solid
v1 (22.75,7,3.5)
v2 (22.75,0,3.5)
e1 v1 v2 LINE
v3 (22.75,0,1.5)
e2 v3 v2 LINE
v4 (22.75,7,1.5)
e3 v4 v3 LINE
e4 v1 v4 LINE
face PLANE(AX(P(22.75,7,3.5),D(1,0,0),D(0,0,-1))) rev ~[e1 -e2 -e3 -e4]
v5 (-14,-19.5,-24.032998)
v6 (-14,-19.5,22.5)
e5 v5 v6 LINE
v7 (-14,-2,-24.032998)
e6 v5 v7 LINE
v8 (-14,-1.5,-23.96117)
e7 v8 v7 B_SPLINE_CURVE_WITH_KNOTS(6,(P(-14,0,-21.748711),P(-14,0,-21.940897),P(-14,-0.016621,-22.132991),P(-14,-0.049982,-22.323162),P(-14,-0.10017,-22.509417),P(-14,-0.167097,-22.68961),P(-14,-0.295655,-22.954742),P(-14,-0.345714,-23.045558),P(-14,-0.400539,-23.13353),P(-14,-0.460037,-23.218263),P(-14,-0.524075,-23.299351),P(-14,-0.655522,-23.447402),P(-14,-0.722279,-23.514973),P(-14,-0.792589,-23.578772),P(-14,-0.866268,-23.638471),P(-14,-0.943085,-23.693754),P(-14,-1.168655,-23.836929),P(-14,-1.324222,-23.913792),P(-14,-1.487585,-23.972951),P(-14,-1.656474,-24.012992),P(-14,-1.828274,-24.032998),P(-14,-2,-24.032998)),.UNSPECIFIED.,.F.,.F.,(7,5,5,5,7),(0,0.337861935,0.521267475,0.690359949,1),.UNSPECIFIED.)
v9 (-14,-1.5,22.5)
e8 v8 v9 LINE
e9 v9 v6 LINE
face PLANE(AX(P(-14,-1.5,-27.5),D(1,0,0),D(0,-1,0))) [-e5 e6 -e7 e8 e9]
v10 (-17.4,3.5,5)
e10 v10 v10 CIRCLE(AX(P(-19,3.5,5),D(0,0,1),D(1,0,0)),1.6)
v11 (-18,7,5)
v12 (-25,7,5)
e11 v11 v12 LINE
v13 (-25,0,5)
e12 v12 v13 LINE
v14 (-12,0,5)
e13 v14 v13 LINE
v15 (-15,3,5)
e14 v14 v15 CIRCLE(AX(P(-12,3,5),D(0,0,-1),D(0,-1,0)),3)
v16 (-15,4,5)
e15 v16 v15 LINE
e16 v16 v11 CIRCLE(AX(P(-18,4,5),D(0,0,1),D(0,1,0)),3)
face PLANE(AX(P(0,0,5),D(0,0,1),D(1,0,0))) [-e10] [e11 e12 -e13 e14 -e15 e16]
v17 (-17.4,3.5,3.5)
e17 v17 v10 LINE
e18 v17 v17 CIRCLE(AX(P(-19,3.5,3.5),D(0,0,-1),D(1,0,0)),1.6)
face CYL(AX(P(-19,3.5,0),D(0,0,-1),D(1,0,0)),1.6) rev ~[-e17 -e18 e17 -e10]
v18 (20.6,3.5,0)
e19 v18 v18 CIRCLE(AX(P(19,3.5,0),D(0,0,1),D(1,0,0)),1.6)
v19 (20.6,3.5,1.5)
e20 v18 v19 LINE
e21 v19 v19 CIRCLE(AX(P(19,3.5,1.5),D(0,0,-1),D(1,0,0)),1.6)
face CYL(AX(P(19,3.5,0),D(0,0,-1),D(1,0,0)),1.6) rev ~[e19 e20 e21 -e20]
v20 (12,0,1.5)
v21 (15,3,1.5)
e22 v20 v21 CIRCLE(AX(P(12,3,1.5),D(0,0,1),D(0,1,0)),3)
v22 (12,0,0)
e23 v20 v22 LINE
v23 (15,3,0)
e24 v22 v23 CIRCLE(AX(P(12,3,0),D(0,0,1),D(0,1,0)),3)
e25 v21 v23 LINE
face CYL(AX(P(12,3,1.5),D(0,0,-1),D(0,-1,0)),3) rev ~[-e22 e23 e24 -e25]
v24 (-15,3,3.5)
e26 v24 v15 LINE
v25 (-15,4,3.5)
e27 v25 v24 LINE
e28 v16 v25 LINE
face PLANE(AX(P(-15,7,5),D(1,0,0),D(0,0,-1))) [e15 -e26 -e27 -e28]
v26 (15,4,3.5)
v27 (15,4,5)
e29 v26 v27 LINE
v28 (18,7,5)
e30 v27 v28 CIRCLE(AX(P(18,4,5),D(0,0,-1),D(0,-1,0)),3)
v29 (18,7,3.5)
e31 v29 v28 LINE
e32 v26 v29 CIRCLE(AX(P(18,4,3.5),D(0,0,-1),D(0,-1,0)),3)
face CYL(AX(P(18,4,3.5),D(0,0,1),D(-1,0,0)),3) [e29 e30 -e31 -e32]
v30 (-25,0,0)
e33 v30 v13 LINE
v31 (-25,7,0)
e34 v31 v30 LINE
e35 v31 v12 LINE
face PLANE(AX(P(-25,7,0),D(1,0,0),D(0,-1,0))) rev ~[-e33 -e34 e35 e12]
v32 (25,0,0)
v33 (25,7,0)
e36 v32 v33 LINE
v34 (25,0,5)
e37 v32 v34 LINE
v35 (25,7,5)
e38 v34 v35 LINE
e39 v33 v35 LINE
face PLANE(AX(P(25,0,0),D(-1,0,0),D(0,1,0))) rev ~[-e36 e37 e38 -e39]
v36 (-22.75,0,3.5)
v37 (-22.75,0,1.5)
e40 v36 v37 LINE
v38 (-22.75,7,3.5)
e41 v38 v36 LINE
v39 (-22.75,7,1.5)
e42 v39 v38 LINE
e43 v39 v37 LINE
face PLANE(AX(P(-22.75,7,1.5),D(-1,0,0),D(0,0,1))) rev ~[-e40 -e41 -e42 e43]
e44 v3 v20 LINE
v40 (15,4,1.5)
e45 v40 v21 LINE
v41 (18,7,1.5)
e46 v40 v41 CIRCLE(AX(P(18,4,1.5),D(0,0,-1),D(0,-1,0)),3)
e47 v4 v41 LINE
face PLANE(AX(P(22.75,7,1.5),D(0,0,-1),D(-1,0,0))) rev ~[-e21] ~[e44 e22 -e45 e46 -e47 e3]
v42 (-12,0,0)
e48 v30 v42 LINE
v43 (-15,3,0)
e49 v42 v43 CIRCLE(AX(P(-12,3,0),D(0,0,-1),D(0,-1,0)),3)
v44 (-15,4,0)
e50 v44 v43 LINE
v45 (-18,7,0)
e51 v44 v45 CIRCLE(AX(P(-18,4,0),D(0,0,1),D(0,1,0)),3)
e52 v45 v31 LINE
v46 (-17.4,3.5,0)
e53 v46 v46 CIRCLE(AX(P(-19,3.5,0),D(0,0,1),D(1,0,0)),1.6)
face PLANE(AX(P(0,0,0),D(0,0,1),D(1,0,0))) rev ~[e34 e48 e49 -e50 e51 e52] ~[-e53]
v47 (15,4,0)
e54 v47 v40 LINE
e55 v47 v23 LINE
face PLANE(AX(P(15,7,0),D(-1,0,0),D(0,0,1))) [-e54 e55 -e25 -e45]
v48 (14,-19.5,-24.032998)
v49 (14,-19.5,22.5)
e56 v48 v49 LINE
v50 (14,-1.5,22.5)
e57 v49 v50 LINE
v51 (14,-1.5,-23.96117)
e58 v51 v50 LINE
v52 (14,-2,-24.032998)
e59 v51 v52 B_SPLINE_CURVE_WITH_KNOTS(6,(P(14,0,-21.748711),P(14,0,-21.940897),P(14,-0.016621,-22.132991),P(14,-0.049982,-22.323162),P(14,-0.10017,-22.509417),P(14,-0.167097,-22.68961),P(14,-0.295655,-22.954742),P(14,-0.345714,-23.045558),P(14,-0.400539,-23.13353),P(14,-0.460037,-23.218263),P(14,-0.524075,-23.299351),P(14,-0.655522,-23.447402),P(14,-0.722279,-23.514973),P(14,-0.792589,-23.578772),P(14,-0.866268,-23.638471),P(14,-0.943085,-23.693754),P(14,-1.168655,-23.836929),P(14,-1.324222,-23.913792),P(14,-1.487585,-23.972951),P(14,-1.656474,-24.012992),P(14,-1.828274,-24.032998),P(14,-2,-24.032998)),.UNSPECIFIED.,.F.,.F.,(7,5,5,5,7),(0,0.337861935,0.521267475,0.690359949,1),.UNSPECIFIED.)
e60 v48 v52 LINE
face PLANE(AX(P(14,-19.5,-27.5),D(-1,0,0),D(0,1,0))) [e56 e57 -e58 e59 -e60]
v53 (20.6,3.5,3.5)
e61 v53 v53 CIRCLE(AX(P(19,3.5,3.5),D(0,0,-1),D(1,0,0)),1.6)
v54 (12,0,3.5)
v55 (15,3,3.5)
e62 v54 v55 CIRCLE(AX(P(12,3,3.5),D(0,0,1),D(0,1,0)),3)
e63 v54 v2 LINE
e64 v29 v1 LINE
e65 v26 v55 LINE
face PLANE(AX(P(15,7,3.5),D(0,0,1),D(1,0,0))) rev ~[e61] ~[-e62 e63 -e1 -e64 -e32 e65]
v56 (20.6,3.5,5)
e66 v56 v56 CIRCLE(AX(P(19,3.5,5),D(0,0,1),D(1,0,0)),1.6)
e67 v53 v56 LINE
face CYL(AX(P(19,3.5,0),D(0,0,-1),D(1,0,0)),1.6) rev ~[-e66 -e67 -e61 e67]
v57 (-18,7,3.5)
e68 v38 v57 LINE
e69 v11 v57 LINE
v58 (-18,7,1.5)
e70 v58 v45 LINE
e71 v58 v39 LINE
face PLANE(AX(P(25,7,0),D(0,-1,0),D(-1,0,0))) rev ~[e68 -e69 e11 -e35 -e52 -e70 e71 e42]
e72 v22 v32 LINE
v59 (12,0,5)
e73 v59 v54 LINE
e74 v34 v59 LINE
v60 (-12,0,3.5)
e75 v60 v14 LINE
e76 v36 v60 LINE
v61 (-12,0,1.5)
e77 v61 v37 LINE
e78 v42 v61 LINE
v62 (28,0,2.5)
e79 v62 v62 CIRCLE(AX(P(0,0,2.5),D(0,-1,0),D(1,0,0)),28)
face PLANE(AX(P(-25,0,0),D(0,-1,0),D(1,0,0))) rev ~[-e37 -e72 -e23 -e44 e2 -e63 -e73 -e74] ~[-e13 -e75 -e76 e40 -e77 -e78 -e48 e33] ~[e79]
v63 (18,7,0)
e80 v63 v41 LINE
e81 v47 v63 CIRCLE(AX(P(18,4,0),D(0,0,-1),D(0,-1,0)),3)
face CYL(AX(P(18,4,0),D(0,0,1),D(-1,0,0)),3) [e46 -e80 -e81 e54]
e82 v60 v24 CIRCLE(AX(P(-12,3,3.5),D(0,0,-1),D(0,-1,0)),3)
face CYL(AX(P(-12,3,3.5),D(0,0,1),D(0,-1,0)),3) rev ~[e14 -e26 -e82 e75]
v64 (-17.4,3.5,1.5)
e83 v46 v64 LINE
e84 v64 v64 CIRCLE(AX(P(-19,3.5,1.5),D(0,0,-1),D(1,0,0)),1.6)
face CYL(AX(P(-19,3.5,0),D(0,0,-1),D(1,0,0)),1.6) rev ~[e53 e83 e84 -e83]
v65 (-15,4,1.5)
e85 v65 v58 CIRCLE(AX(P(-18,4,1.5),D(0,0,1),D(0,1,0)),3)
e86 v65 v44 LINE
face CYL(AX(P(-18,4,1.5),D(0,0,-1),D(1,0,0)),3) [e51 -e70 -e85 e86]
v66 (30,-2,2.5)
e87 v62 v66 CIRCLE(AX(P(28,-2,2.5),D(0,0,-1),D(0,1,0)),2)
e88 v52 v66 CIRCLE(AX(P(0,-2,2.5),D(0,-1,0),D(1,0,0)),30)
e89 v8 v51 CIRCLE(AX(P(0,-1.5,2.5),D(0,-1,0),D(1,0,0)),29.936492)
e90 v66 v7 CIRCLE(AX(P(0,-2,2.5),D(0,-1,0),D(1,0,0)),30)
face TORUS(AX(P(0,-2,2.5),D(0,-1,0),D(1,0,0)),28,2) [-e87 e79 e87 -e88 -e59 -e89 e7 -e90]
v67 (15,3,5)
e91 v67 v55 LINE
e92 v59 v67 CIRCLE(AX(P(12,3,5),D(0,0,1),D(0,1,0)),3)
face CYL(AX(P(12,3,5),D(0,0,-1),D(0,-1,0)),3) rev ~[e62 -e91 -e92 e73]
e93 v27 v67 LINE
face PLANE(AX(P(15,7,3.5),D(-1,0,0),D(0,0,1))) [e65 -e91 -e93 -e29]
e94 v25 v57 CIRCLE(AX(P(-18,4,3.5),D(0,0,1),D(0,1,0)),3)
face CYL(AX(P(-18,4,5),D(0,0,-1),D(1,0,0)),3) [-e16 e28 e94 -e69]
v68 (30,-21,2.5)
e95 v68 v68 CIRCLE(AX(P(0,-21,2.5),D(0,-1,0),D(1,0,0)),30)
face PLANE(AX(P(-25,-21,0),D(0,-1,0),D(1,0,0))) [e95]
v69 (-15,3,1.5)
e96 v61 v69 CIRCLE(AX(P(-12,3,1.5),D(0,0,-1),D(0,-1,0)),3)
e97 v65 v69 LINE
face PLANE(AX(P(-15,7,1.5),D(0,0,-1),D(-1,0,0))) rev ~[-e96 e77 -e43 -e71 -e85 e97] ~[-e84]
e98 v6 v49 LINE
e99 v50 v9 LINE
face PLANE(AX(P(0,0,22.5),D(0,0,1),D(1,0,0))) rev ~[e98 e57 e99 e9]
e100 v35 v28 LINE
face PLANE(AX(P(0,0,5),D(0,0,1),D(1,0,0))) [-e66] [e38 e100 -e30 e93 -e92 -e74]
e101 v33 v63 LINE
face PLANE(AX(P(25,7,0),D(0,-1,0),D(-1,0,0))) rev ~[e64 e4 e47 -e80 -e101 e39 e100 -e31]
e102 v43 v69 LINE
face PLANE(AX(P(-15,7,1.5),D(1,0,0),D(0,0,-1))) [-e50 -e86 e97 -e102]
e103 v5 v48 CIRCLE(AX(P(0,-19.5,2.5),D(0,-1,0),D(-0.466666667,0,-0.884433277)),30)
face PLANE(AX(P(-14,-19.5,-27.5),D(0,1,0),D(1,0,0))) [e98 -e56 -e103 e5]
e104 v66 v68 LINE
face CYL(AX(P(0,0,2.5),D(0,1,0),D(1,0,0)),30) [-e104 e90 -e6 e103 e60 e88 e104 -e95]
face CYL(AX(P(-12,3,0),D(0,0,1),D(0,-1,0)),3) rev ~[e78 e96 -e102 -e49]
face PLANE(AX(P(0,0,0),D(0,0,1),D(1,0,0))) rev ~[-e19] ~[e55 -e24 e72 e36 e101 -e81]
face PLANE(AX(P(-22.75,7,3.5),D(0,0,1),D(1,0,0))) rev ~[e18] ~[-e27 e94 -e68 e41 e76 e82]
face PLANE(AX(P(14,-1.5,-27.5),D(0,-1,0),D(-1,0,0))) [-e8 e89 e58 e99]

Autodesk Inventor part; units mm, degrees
ref_plane "Work Plane2" through (0, 0, 32.5) normal (0, 0, 1) x (1, 0, 0)
ref_plane "YZ Plane" through (0, 0, 0) normal (1, 0, 0) x (0, 1, 0)
sketch "Sketch1" plane through (0, 0, 0) normal (0, 0, 1) x (1, 0, 0)
  line L0 (25, 7) -> (-25, 7)
  line L1 (-25, 7) -> (-25, 0)
  line L2 (-25, 0) -> (25, 0)
  line L3 (25, 0) -> (25, 7)
  circle A0 centre (-19, 3.5) radius 1.6
  circle A1 centre (19, 3.5) radius 1.6
  line L4 (19, 3.5) -> (-19, 3.5) construction
  line L5 (19, 3.5) -> (25, 7) construction
  line L6 (19, 3.5) -> (25, 0) construction
  line L7 (-19, 3.5) -> (-25, 7) construction
  line L8 (-19, 3.5) -> (-25, 0) construction
  line L9 (0, 0) -> (-19, 3.5) construction
  line L10 (0, 0) -> (19, 3.5) construction
  dimension "d0" = 3.2
  dimension "d1" = 38
  dimension "d2" = 7
  dimension "d3" = 50
extrude "Extrusion1" add sketch "Sketch1" along normal blind 5
sketch "Sketch2" plane through (-25, 7, 0) normal (0, 1, 0) x (1, 0, 0)
  line L0 (2.25, -3.5) -> (10, -3.5)
  line L1 (47.75, -3.5) -> (47.75, -1.5)
  line L2 (47.75, -1.5) -> (40, -1.5)
  line L3 (2.25, -1.5) -> (2.25, -3.5)
  line L4 (50, -5) -> (0, -5) construction
  line L5 (0, -5) -> (2.25, -3.5) construction
  line L6 (50, 0) -> (0, 0) construction
  line L7 (2.25, -1.5) -> (0, 0) construction
  line L8 (50, 0) -> (50, -5) construction
  line L9 (47.75, -3.5) -> (50, -5) construction
  line L10 (40, -3.5) -> (40, -5)
  line L11 (40, -5) -> (10, -5)
  line L12 (10, -5) -> (10, -3.5)
  line L13 (10, -1.5) -> (10, 0)
  line L14 (10, 0) -> (40, 0)
  line L15 (40, 0) -> (40, -1.5)
  line L16 (40, -3.5) -> (47.75, -3.5)
  line L17 (40, -1.5) -> (10, -1.5) construction
  line L18 (10, -3.5) -> (40, -3.5) construction
  line L19 (10, -1.5) -> (2.25, -1.5)
  line L20 (47.75, -3.5) -> (40, -5) construction
  line L21 (40, 0) -> (47.75, -1.5) construction
  line L22 (10, -5) -> (2.25, -3.5) construction
  line L23 (2.25, -1.5) -> (10, 0) construction
  point P0 (25, 0)
  dimension "d6" = 45.5
  dimension "d7" = 2
  dimension "d13" = 30
extrude "Extrusion2" cut sketch "Sketch2" against normal up to next
sketch "Sketch3" plane through (-25, 0, 0) normal (0, -1, 0) x (1, 0, 0)
  circle A0 centre (25, 2.5) radius 30
  line L0 (0, 5) -> (50, 5) construction
  line L1 (0, 5) -> (25, 2.5) construction
  line L2 (0, 0) -> (50, 0) construction
  line L3 (25, 2.5) -> (0, 0) construction
  line L4 (25, 2.5) -> (50, 5) construction
  point P0 (25, 0)
  dimension "d10" = 60
extrude "Extrusion3" add sketch "Sketch3" along normal blind 21
ref_plane "Work Plane1" through (0, 0, -27.5) normal (0, 0, 1) x (1, 0, 0)
sketch "Sketch5" plane through (0, 0, -27.5) normal (0, 0, 1) x (1, 0, 0)
  line L0 (14, -1.5) -> (-14, -1.5)
  line L1 (-14, -1.5) -> (-14, -19.5)
  line L2 (-14, -19.5) -> (14, -19.5)
  line L3 (14, -19.5) -> (14, -1.5)
  line L4 (-30, -21) -> (30, -21) construction
  line L5 (30, 0) -> (-30, 0) construction
  line L6 (30, 0) -> (-30, 0) construction
  line L7 (30, 0) -> (14, -1.5) construction
  line L8 (-14, -1.5) -> (-30, 0) construction
  line L9 (-30, -21) -> (30, -21) construction
  line L10 (-30, -21) -> (-14, -19.5) construction
  point P0 (0, 0)
  dimension "d16" = 18
  dimension "d17" = 28
extrude "Extrusion4" cut sketch "Sketch5" along normal blind 50
fillet "Fillet1" radius 3 8 edges at (15, 7, 0.75) (15, 7, 4.25) (15, 0, 4.25) (15, 0, 0.75) (-15, 0, 0.75) (-15, 7, 0.75) (-15, 7, 4.25) (-15, 0, 4.25)
fillet "Fillet2" radius 2 1 edges at (-30, 0, 2.5)
sketch "Sketch7" plane through (0, 0, 32.5) normal (0, 0, 1) x (1, 0, 0)
  spline S0 degree 3 poles (3.6755, -17.8887) (1.3417, -19.2361) (-1.5336, -19.2361) (-3.8674, -17.8887) knots 0 0 0 0 1 1 1 1
  line L0 (3.6755, -17.8887) -> (1.3417, -19.2361) construction
  line L1 (1.3417, -19.2361) -> (-1.5336, -19.2361) construction
  line L2 (-1.5336, -19.2361) -> (-3.8674, -17.8887) construction
  spline S1 degree 3 poles (-3.8674, -17.8887) (-6.2011, -16.5413) (-7.6388, -14.0512) (-7.6388, -11.3564) knots 0 0 0 0 1 1 1 1
  line L3 (-3.8674, -17.8887) -> (-6.2011, -16.5413) construction
  line L4 (-6.2011, -16.5413) -> (-7.6388, -14.0512) construction
  line L5 (-7.6388, -14.0512) -> (-7.6388, -11.3564) construction
  spline S2 degree 3 poles (-7.6388, -11.3564) (-7.6388, -8.6616) (-6.2011, -6.1715) (-3.8674, -4.8241) knots 0 0 0 0 1 1 1 1
  line L6 (-7.6388, -11.3564) -> (-7.6388, -8.6616) construction
  line L7 (-7.6388, -8.6616) -> (-6.2011, -6.1715) construction
  line L8 (-6.2011, -6.1715) -> (-3.8674, -4.8241) construction
  spline S3 degree 3 poles (-3.8674, -4.8241) (-1.5336, -3.4767) (1.3417, -3.4767) (3.6755, -4.8241) knots 0 0 0 0 1 1 1 1
  line L9 (-3.8674, -4.8241) -> (-1.5336, -3.4767) construction
  line L10 (-1.5336, -3.4767) -> (1.3417, -3.4767) construction
  line L11 (1.3417, -3.4767) -> (3.6755, -4.8241) construction
  spline S4 degree 3 poles (3.6755, -4.8241) (6.0092, -6.1715) (7.4469, -8.6616) (7.4469, -11.3564) knots 0 0 0 0 1 1 1 1
  line L12 (3.6755, -4.8241) -> (6.0092, -6.1715) construction
  line L13 (6.0092, -6.1715) -> (7.4469, -8.6616) construction
  line L14 (7.4469, -8.6616) -> (7.4469, -11.3564) construction
  spline S5 degree 3 poles (7.4469, -11.3564) (7.4469, -14.0512) (6.0092, -16.5413) (3.6755, -17.8887) knots 0 0 0 0 1 1 1 1
  line L15 (7.4469, -11.3564) -> (7.4469, -14.0512) construction
  line L16 (7.4469, -14.0512) -> (6.0092, -16.5413) construction
  line L17 (6.0092, -16.5413) -> (3.6755, -17.8887) construction
  spline S6 degree 3 poles (-0.623, -14.5187) (-0.623, -14.5201) (-0.623, -15.9241) (-2.0285, -15.9241) knots 0 0 0 0 1 1 1 1
  line L18 (-0.623, -14.5187) -> (-0.623, -14.5187) construction
  line L19 (-0.623, -14.5187) -> (-0.623, -15.9241) construction
  line L20 (-0.623, -15.9241) -> (-2.0285, -15.9241) construction
  spline S7 degree 3 poles (-2.0285, -15.9241) (-3.4339, -15.9241) (-3.4339, -14.5201) (-3.4339, -14.5187) knots 0 0 0 0 1 1 1 1
  line L21 (-2.0285, -15.9241) -> (-3.4339, -15.9241) construction
  line L22 (-3.4339, -15.9241) -> (-3.4339, -14.5187) construction
  line L23 (-3.4339, -14.5187) -> (-3.4339, -14.5187) construction
  line L24 (-0.623, -5.7345) -> (-0.623, -14.5187)
  spline S8 degree 3 poles (-4.488, -14.5187) (-4.488, -14.5211) (-4.488, -16.9782) (-2.0285, -16.9782) knots 0 0 0 0 1 1 1 1
  line L25 (-4.488, -14.5187) -> (-4.488, -14.5187) construction
  line L26 (-4.488, -14.5187) -> (-4.488, -16.9782) construction
  line L27 (-4.488, -16.9782) -> (-2.0285, -16.9782) construction
  spline S9 degree 3 poles (-2.0285, -16.9782) (0.4311, -16.9782) (0.4311, -14.5211) (0.4311, -14.5187) knots 0 0 0 0 1 1 1 1
  line L28 (-2.0285, -16.9782) -> (0.4311, -16.9782) construction
  line L29 (0.4311, -16.9782) -> (0.4311, -14.5187) construction
  line L30 (0.4311, -14.5187) -> (0.4311, -14.5187) construction
  line L31 (-3.4339, -14.5187) -> (-4.488, -14.5187)
  spline S10 degree 3 poles (1.8366, -14.5187) (1.839, -14.5187) (4.2961, -14.5187) (4.2961, -12.0591) knots 0 0 0 0 1 1 1 1
  line L32 (1.8366, -14.5187) -> (1.8366, -14.5187) construction
  line L33 (1.8366, -14.5187) -> (4.2961, -14.5187) construction
  line L34 (4.2961, -14.5187) -> (4.2961, -12.0591) construction
  spline S11 degree 3 poles (4.2961, -12.0591) (4.2961, -11.0712) (3.8992, -10.4803) (3.4243, -10.1266) knots 0 0 0 0 1 1 1 1
  line L35 (4.2961, -12.0591) -> (4.2961, -11.0712) construction
  line L36 (4.2961, -11.0712) -> (3.8992, -10.4803) construction
  line L37 (3.8992, -10.4803) -> (3.4243, -10.1266) construction
  spline S12 degree 3 poles (3.4243, -10.1266) (3.8992, -9.7729) (4.2961, -9.182) (4.2961, -8.1941) knots 0 0 0 0 1 1 1 1
  line L38 (3.4243, -10.1266) -> (3.8992, -9.7729) construction
  line L39 (3.8992, -9.7729) -> (4.2961, -9.182) construction
  line L40 (4.2961, -9.182) -> (4.2961, -8.1941) construction
  spline S13 degree 3 poles (4.2961, -8.1941) (4.2961, -5.7345) (1.839, -5.7345) (1.8366, -5.7345) knots 0 0 0 0 1 1 1 1
  line L41 (4.2961, -8.1941) -> (4.2961, -5.7345) construction
  line L42 (4.2961, -5.7345) -> (1.8366, -5.7345) construction
  line L43 (1.8366, -5.7345) -> (1.8366, -5.7345) construction
  line L44 (0.4311, -14.5187) -> (1.8366, -14.5187)
  line L45 (1.8366, -5.7345) -> (-0.623, -5.7345)
  spline S14 degree 3 poles (1.8366, -6.7886) (1.838, -6.7886) (3.242, -6.7886) (3.242, -8.1941) knots 0 0 0 0 1 1 1 1
  line L46 (1.8366, -6.7886) -> (1.8366, -6.7886) construction
  line L47 (1.8366, -6.7886) -> (3.242, -6.7886) construction
  line L48 (3.242, -6.7886) -> (3.242, -8.1941) construction
  spline S15 degree 3 poles (3.242, -8.1941) (3.242, -9.5995) (1.838, -9.5995) (1.8366, -9.5995) knots 0 0 0 0 1 1 1 1
  line L49 (3.242, -8.1941) -> (3.242, -9.5995) construction
  line L50 (3.242, -9.5995) -> (1.8366, -9.5995) construction
  line L51 (1.8366, -9.5995) -> (1.8366, -9.5995) construction
  line L52 (0.4311, -6.7886) -> (1.8366, -6.7886)
  line L53 (1.8366, -9.5995) -> (0.4311, -9.5995)
  line L54 (0.4311, -9.5995) -> (0.4311, -6.7886)
  spline S16 degree 3 poles (1.8366, -10.6536) (1.838, -10.6536) (3.242, -10.6536) (3.242, -12.0591) knots 0 0 0 0 1 1 1 1
  line L55 (1.8366, -10.6536) -> (1.8366, -10.6536) construction
  line L56 (1.8366, -10.6536) -> (3.242, -10.6536) construction
  line L57 (3.242, -10.6536) -> (3.242, -12.0591) construction
  spline S17 degree 3 poles (3.242, -12.0591) (3.242, -13.4646) (1.838, -13.4646) (1.8366, -13.4646) knots 0 0 0 0 1 1 1 1
  line L58 (3.242, -12.0591) -> (3.242, -13.4646) construction
  line L59 (3.242, -13.4646) -> (1.8366, -13.4646) construction
  line L60 (1.8366, -13.4646) -> (1.8366, -13.4646) construction
  line L61 (0.4311, -10.6536) -> (1.8366, -10.6536)
  line L62 (1.8366, -13.4646) -> (0.4311, -13.4646)
  line L63 (0.4311, -13.4646) -> (0.4311, -10.6536)
  point P0 (0, 0)
properties part number "Base with 9V Batt"
